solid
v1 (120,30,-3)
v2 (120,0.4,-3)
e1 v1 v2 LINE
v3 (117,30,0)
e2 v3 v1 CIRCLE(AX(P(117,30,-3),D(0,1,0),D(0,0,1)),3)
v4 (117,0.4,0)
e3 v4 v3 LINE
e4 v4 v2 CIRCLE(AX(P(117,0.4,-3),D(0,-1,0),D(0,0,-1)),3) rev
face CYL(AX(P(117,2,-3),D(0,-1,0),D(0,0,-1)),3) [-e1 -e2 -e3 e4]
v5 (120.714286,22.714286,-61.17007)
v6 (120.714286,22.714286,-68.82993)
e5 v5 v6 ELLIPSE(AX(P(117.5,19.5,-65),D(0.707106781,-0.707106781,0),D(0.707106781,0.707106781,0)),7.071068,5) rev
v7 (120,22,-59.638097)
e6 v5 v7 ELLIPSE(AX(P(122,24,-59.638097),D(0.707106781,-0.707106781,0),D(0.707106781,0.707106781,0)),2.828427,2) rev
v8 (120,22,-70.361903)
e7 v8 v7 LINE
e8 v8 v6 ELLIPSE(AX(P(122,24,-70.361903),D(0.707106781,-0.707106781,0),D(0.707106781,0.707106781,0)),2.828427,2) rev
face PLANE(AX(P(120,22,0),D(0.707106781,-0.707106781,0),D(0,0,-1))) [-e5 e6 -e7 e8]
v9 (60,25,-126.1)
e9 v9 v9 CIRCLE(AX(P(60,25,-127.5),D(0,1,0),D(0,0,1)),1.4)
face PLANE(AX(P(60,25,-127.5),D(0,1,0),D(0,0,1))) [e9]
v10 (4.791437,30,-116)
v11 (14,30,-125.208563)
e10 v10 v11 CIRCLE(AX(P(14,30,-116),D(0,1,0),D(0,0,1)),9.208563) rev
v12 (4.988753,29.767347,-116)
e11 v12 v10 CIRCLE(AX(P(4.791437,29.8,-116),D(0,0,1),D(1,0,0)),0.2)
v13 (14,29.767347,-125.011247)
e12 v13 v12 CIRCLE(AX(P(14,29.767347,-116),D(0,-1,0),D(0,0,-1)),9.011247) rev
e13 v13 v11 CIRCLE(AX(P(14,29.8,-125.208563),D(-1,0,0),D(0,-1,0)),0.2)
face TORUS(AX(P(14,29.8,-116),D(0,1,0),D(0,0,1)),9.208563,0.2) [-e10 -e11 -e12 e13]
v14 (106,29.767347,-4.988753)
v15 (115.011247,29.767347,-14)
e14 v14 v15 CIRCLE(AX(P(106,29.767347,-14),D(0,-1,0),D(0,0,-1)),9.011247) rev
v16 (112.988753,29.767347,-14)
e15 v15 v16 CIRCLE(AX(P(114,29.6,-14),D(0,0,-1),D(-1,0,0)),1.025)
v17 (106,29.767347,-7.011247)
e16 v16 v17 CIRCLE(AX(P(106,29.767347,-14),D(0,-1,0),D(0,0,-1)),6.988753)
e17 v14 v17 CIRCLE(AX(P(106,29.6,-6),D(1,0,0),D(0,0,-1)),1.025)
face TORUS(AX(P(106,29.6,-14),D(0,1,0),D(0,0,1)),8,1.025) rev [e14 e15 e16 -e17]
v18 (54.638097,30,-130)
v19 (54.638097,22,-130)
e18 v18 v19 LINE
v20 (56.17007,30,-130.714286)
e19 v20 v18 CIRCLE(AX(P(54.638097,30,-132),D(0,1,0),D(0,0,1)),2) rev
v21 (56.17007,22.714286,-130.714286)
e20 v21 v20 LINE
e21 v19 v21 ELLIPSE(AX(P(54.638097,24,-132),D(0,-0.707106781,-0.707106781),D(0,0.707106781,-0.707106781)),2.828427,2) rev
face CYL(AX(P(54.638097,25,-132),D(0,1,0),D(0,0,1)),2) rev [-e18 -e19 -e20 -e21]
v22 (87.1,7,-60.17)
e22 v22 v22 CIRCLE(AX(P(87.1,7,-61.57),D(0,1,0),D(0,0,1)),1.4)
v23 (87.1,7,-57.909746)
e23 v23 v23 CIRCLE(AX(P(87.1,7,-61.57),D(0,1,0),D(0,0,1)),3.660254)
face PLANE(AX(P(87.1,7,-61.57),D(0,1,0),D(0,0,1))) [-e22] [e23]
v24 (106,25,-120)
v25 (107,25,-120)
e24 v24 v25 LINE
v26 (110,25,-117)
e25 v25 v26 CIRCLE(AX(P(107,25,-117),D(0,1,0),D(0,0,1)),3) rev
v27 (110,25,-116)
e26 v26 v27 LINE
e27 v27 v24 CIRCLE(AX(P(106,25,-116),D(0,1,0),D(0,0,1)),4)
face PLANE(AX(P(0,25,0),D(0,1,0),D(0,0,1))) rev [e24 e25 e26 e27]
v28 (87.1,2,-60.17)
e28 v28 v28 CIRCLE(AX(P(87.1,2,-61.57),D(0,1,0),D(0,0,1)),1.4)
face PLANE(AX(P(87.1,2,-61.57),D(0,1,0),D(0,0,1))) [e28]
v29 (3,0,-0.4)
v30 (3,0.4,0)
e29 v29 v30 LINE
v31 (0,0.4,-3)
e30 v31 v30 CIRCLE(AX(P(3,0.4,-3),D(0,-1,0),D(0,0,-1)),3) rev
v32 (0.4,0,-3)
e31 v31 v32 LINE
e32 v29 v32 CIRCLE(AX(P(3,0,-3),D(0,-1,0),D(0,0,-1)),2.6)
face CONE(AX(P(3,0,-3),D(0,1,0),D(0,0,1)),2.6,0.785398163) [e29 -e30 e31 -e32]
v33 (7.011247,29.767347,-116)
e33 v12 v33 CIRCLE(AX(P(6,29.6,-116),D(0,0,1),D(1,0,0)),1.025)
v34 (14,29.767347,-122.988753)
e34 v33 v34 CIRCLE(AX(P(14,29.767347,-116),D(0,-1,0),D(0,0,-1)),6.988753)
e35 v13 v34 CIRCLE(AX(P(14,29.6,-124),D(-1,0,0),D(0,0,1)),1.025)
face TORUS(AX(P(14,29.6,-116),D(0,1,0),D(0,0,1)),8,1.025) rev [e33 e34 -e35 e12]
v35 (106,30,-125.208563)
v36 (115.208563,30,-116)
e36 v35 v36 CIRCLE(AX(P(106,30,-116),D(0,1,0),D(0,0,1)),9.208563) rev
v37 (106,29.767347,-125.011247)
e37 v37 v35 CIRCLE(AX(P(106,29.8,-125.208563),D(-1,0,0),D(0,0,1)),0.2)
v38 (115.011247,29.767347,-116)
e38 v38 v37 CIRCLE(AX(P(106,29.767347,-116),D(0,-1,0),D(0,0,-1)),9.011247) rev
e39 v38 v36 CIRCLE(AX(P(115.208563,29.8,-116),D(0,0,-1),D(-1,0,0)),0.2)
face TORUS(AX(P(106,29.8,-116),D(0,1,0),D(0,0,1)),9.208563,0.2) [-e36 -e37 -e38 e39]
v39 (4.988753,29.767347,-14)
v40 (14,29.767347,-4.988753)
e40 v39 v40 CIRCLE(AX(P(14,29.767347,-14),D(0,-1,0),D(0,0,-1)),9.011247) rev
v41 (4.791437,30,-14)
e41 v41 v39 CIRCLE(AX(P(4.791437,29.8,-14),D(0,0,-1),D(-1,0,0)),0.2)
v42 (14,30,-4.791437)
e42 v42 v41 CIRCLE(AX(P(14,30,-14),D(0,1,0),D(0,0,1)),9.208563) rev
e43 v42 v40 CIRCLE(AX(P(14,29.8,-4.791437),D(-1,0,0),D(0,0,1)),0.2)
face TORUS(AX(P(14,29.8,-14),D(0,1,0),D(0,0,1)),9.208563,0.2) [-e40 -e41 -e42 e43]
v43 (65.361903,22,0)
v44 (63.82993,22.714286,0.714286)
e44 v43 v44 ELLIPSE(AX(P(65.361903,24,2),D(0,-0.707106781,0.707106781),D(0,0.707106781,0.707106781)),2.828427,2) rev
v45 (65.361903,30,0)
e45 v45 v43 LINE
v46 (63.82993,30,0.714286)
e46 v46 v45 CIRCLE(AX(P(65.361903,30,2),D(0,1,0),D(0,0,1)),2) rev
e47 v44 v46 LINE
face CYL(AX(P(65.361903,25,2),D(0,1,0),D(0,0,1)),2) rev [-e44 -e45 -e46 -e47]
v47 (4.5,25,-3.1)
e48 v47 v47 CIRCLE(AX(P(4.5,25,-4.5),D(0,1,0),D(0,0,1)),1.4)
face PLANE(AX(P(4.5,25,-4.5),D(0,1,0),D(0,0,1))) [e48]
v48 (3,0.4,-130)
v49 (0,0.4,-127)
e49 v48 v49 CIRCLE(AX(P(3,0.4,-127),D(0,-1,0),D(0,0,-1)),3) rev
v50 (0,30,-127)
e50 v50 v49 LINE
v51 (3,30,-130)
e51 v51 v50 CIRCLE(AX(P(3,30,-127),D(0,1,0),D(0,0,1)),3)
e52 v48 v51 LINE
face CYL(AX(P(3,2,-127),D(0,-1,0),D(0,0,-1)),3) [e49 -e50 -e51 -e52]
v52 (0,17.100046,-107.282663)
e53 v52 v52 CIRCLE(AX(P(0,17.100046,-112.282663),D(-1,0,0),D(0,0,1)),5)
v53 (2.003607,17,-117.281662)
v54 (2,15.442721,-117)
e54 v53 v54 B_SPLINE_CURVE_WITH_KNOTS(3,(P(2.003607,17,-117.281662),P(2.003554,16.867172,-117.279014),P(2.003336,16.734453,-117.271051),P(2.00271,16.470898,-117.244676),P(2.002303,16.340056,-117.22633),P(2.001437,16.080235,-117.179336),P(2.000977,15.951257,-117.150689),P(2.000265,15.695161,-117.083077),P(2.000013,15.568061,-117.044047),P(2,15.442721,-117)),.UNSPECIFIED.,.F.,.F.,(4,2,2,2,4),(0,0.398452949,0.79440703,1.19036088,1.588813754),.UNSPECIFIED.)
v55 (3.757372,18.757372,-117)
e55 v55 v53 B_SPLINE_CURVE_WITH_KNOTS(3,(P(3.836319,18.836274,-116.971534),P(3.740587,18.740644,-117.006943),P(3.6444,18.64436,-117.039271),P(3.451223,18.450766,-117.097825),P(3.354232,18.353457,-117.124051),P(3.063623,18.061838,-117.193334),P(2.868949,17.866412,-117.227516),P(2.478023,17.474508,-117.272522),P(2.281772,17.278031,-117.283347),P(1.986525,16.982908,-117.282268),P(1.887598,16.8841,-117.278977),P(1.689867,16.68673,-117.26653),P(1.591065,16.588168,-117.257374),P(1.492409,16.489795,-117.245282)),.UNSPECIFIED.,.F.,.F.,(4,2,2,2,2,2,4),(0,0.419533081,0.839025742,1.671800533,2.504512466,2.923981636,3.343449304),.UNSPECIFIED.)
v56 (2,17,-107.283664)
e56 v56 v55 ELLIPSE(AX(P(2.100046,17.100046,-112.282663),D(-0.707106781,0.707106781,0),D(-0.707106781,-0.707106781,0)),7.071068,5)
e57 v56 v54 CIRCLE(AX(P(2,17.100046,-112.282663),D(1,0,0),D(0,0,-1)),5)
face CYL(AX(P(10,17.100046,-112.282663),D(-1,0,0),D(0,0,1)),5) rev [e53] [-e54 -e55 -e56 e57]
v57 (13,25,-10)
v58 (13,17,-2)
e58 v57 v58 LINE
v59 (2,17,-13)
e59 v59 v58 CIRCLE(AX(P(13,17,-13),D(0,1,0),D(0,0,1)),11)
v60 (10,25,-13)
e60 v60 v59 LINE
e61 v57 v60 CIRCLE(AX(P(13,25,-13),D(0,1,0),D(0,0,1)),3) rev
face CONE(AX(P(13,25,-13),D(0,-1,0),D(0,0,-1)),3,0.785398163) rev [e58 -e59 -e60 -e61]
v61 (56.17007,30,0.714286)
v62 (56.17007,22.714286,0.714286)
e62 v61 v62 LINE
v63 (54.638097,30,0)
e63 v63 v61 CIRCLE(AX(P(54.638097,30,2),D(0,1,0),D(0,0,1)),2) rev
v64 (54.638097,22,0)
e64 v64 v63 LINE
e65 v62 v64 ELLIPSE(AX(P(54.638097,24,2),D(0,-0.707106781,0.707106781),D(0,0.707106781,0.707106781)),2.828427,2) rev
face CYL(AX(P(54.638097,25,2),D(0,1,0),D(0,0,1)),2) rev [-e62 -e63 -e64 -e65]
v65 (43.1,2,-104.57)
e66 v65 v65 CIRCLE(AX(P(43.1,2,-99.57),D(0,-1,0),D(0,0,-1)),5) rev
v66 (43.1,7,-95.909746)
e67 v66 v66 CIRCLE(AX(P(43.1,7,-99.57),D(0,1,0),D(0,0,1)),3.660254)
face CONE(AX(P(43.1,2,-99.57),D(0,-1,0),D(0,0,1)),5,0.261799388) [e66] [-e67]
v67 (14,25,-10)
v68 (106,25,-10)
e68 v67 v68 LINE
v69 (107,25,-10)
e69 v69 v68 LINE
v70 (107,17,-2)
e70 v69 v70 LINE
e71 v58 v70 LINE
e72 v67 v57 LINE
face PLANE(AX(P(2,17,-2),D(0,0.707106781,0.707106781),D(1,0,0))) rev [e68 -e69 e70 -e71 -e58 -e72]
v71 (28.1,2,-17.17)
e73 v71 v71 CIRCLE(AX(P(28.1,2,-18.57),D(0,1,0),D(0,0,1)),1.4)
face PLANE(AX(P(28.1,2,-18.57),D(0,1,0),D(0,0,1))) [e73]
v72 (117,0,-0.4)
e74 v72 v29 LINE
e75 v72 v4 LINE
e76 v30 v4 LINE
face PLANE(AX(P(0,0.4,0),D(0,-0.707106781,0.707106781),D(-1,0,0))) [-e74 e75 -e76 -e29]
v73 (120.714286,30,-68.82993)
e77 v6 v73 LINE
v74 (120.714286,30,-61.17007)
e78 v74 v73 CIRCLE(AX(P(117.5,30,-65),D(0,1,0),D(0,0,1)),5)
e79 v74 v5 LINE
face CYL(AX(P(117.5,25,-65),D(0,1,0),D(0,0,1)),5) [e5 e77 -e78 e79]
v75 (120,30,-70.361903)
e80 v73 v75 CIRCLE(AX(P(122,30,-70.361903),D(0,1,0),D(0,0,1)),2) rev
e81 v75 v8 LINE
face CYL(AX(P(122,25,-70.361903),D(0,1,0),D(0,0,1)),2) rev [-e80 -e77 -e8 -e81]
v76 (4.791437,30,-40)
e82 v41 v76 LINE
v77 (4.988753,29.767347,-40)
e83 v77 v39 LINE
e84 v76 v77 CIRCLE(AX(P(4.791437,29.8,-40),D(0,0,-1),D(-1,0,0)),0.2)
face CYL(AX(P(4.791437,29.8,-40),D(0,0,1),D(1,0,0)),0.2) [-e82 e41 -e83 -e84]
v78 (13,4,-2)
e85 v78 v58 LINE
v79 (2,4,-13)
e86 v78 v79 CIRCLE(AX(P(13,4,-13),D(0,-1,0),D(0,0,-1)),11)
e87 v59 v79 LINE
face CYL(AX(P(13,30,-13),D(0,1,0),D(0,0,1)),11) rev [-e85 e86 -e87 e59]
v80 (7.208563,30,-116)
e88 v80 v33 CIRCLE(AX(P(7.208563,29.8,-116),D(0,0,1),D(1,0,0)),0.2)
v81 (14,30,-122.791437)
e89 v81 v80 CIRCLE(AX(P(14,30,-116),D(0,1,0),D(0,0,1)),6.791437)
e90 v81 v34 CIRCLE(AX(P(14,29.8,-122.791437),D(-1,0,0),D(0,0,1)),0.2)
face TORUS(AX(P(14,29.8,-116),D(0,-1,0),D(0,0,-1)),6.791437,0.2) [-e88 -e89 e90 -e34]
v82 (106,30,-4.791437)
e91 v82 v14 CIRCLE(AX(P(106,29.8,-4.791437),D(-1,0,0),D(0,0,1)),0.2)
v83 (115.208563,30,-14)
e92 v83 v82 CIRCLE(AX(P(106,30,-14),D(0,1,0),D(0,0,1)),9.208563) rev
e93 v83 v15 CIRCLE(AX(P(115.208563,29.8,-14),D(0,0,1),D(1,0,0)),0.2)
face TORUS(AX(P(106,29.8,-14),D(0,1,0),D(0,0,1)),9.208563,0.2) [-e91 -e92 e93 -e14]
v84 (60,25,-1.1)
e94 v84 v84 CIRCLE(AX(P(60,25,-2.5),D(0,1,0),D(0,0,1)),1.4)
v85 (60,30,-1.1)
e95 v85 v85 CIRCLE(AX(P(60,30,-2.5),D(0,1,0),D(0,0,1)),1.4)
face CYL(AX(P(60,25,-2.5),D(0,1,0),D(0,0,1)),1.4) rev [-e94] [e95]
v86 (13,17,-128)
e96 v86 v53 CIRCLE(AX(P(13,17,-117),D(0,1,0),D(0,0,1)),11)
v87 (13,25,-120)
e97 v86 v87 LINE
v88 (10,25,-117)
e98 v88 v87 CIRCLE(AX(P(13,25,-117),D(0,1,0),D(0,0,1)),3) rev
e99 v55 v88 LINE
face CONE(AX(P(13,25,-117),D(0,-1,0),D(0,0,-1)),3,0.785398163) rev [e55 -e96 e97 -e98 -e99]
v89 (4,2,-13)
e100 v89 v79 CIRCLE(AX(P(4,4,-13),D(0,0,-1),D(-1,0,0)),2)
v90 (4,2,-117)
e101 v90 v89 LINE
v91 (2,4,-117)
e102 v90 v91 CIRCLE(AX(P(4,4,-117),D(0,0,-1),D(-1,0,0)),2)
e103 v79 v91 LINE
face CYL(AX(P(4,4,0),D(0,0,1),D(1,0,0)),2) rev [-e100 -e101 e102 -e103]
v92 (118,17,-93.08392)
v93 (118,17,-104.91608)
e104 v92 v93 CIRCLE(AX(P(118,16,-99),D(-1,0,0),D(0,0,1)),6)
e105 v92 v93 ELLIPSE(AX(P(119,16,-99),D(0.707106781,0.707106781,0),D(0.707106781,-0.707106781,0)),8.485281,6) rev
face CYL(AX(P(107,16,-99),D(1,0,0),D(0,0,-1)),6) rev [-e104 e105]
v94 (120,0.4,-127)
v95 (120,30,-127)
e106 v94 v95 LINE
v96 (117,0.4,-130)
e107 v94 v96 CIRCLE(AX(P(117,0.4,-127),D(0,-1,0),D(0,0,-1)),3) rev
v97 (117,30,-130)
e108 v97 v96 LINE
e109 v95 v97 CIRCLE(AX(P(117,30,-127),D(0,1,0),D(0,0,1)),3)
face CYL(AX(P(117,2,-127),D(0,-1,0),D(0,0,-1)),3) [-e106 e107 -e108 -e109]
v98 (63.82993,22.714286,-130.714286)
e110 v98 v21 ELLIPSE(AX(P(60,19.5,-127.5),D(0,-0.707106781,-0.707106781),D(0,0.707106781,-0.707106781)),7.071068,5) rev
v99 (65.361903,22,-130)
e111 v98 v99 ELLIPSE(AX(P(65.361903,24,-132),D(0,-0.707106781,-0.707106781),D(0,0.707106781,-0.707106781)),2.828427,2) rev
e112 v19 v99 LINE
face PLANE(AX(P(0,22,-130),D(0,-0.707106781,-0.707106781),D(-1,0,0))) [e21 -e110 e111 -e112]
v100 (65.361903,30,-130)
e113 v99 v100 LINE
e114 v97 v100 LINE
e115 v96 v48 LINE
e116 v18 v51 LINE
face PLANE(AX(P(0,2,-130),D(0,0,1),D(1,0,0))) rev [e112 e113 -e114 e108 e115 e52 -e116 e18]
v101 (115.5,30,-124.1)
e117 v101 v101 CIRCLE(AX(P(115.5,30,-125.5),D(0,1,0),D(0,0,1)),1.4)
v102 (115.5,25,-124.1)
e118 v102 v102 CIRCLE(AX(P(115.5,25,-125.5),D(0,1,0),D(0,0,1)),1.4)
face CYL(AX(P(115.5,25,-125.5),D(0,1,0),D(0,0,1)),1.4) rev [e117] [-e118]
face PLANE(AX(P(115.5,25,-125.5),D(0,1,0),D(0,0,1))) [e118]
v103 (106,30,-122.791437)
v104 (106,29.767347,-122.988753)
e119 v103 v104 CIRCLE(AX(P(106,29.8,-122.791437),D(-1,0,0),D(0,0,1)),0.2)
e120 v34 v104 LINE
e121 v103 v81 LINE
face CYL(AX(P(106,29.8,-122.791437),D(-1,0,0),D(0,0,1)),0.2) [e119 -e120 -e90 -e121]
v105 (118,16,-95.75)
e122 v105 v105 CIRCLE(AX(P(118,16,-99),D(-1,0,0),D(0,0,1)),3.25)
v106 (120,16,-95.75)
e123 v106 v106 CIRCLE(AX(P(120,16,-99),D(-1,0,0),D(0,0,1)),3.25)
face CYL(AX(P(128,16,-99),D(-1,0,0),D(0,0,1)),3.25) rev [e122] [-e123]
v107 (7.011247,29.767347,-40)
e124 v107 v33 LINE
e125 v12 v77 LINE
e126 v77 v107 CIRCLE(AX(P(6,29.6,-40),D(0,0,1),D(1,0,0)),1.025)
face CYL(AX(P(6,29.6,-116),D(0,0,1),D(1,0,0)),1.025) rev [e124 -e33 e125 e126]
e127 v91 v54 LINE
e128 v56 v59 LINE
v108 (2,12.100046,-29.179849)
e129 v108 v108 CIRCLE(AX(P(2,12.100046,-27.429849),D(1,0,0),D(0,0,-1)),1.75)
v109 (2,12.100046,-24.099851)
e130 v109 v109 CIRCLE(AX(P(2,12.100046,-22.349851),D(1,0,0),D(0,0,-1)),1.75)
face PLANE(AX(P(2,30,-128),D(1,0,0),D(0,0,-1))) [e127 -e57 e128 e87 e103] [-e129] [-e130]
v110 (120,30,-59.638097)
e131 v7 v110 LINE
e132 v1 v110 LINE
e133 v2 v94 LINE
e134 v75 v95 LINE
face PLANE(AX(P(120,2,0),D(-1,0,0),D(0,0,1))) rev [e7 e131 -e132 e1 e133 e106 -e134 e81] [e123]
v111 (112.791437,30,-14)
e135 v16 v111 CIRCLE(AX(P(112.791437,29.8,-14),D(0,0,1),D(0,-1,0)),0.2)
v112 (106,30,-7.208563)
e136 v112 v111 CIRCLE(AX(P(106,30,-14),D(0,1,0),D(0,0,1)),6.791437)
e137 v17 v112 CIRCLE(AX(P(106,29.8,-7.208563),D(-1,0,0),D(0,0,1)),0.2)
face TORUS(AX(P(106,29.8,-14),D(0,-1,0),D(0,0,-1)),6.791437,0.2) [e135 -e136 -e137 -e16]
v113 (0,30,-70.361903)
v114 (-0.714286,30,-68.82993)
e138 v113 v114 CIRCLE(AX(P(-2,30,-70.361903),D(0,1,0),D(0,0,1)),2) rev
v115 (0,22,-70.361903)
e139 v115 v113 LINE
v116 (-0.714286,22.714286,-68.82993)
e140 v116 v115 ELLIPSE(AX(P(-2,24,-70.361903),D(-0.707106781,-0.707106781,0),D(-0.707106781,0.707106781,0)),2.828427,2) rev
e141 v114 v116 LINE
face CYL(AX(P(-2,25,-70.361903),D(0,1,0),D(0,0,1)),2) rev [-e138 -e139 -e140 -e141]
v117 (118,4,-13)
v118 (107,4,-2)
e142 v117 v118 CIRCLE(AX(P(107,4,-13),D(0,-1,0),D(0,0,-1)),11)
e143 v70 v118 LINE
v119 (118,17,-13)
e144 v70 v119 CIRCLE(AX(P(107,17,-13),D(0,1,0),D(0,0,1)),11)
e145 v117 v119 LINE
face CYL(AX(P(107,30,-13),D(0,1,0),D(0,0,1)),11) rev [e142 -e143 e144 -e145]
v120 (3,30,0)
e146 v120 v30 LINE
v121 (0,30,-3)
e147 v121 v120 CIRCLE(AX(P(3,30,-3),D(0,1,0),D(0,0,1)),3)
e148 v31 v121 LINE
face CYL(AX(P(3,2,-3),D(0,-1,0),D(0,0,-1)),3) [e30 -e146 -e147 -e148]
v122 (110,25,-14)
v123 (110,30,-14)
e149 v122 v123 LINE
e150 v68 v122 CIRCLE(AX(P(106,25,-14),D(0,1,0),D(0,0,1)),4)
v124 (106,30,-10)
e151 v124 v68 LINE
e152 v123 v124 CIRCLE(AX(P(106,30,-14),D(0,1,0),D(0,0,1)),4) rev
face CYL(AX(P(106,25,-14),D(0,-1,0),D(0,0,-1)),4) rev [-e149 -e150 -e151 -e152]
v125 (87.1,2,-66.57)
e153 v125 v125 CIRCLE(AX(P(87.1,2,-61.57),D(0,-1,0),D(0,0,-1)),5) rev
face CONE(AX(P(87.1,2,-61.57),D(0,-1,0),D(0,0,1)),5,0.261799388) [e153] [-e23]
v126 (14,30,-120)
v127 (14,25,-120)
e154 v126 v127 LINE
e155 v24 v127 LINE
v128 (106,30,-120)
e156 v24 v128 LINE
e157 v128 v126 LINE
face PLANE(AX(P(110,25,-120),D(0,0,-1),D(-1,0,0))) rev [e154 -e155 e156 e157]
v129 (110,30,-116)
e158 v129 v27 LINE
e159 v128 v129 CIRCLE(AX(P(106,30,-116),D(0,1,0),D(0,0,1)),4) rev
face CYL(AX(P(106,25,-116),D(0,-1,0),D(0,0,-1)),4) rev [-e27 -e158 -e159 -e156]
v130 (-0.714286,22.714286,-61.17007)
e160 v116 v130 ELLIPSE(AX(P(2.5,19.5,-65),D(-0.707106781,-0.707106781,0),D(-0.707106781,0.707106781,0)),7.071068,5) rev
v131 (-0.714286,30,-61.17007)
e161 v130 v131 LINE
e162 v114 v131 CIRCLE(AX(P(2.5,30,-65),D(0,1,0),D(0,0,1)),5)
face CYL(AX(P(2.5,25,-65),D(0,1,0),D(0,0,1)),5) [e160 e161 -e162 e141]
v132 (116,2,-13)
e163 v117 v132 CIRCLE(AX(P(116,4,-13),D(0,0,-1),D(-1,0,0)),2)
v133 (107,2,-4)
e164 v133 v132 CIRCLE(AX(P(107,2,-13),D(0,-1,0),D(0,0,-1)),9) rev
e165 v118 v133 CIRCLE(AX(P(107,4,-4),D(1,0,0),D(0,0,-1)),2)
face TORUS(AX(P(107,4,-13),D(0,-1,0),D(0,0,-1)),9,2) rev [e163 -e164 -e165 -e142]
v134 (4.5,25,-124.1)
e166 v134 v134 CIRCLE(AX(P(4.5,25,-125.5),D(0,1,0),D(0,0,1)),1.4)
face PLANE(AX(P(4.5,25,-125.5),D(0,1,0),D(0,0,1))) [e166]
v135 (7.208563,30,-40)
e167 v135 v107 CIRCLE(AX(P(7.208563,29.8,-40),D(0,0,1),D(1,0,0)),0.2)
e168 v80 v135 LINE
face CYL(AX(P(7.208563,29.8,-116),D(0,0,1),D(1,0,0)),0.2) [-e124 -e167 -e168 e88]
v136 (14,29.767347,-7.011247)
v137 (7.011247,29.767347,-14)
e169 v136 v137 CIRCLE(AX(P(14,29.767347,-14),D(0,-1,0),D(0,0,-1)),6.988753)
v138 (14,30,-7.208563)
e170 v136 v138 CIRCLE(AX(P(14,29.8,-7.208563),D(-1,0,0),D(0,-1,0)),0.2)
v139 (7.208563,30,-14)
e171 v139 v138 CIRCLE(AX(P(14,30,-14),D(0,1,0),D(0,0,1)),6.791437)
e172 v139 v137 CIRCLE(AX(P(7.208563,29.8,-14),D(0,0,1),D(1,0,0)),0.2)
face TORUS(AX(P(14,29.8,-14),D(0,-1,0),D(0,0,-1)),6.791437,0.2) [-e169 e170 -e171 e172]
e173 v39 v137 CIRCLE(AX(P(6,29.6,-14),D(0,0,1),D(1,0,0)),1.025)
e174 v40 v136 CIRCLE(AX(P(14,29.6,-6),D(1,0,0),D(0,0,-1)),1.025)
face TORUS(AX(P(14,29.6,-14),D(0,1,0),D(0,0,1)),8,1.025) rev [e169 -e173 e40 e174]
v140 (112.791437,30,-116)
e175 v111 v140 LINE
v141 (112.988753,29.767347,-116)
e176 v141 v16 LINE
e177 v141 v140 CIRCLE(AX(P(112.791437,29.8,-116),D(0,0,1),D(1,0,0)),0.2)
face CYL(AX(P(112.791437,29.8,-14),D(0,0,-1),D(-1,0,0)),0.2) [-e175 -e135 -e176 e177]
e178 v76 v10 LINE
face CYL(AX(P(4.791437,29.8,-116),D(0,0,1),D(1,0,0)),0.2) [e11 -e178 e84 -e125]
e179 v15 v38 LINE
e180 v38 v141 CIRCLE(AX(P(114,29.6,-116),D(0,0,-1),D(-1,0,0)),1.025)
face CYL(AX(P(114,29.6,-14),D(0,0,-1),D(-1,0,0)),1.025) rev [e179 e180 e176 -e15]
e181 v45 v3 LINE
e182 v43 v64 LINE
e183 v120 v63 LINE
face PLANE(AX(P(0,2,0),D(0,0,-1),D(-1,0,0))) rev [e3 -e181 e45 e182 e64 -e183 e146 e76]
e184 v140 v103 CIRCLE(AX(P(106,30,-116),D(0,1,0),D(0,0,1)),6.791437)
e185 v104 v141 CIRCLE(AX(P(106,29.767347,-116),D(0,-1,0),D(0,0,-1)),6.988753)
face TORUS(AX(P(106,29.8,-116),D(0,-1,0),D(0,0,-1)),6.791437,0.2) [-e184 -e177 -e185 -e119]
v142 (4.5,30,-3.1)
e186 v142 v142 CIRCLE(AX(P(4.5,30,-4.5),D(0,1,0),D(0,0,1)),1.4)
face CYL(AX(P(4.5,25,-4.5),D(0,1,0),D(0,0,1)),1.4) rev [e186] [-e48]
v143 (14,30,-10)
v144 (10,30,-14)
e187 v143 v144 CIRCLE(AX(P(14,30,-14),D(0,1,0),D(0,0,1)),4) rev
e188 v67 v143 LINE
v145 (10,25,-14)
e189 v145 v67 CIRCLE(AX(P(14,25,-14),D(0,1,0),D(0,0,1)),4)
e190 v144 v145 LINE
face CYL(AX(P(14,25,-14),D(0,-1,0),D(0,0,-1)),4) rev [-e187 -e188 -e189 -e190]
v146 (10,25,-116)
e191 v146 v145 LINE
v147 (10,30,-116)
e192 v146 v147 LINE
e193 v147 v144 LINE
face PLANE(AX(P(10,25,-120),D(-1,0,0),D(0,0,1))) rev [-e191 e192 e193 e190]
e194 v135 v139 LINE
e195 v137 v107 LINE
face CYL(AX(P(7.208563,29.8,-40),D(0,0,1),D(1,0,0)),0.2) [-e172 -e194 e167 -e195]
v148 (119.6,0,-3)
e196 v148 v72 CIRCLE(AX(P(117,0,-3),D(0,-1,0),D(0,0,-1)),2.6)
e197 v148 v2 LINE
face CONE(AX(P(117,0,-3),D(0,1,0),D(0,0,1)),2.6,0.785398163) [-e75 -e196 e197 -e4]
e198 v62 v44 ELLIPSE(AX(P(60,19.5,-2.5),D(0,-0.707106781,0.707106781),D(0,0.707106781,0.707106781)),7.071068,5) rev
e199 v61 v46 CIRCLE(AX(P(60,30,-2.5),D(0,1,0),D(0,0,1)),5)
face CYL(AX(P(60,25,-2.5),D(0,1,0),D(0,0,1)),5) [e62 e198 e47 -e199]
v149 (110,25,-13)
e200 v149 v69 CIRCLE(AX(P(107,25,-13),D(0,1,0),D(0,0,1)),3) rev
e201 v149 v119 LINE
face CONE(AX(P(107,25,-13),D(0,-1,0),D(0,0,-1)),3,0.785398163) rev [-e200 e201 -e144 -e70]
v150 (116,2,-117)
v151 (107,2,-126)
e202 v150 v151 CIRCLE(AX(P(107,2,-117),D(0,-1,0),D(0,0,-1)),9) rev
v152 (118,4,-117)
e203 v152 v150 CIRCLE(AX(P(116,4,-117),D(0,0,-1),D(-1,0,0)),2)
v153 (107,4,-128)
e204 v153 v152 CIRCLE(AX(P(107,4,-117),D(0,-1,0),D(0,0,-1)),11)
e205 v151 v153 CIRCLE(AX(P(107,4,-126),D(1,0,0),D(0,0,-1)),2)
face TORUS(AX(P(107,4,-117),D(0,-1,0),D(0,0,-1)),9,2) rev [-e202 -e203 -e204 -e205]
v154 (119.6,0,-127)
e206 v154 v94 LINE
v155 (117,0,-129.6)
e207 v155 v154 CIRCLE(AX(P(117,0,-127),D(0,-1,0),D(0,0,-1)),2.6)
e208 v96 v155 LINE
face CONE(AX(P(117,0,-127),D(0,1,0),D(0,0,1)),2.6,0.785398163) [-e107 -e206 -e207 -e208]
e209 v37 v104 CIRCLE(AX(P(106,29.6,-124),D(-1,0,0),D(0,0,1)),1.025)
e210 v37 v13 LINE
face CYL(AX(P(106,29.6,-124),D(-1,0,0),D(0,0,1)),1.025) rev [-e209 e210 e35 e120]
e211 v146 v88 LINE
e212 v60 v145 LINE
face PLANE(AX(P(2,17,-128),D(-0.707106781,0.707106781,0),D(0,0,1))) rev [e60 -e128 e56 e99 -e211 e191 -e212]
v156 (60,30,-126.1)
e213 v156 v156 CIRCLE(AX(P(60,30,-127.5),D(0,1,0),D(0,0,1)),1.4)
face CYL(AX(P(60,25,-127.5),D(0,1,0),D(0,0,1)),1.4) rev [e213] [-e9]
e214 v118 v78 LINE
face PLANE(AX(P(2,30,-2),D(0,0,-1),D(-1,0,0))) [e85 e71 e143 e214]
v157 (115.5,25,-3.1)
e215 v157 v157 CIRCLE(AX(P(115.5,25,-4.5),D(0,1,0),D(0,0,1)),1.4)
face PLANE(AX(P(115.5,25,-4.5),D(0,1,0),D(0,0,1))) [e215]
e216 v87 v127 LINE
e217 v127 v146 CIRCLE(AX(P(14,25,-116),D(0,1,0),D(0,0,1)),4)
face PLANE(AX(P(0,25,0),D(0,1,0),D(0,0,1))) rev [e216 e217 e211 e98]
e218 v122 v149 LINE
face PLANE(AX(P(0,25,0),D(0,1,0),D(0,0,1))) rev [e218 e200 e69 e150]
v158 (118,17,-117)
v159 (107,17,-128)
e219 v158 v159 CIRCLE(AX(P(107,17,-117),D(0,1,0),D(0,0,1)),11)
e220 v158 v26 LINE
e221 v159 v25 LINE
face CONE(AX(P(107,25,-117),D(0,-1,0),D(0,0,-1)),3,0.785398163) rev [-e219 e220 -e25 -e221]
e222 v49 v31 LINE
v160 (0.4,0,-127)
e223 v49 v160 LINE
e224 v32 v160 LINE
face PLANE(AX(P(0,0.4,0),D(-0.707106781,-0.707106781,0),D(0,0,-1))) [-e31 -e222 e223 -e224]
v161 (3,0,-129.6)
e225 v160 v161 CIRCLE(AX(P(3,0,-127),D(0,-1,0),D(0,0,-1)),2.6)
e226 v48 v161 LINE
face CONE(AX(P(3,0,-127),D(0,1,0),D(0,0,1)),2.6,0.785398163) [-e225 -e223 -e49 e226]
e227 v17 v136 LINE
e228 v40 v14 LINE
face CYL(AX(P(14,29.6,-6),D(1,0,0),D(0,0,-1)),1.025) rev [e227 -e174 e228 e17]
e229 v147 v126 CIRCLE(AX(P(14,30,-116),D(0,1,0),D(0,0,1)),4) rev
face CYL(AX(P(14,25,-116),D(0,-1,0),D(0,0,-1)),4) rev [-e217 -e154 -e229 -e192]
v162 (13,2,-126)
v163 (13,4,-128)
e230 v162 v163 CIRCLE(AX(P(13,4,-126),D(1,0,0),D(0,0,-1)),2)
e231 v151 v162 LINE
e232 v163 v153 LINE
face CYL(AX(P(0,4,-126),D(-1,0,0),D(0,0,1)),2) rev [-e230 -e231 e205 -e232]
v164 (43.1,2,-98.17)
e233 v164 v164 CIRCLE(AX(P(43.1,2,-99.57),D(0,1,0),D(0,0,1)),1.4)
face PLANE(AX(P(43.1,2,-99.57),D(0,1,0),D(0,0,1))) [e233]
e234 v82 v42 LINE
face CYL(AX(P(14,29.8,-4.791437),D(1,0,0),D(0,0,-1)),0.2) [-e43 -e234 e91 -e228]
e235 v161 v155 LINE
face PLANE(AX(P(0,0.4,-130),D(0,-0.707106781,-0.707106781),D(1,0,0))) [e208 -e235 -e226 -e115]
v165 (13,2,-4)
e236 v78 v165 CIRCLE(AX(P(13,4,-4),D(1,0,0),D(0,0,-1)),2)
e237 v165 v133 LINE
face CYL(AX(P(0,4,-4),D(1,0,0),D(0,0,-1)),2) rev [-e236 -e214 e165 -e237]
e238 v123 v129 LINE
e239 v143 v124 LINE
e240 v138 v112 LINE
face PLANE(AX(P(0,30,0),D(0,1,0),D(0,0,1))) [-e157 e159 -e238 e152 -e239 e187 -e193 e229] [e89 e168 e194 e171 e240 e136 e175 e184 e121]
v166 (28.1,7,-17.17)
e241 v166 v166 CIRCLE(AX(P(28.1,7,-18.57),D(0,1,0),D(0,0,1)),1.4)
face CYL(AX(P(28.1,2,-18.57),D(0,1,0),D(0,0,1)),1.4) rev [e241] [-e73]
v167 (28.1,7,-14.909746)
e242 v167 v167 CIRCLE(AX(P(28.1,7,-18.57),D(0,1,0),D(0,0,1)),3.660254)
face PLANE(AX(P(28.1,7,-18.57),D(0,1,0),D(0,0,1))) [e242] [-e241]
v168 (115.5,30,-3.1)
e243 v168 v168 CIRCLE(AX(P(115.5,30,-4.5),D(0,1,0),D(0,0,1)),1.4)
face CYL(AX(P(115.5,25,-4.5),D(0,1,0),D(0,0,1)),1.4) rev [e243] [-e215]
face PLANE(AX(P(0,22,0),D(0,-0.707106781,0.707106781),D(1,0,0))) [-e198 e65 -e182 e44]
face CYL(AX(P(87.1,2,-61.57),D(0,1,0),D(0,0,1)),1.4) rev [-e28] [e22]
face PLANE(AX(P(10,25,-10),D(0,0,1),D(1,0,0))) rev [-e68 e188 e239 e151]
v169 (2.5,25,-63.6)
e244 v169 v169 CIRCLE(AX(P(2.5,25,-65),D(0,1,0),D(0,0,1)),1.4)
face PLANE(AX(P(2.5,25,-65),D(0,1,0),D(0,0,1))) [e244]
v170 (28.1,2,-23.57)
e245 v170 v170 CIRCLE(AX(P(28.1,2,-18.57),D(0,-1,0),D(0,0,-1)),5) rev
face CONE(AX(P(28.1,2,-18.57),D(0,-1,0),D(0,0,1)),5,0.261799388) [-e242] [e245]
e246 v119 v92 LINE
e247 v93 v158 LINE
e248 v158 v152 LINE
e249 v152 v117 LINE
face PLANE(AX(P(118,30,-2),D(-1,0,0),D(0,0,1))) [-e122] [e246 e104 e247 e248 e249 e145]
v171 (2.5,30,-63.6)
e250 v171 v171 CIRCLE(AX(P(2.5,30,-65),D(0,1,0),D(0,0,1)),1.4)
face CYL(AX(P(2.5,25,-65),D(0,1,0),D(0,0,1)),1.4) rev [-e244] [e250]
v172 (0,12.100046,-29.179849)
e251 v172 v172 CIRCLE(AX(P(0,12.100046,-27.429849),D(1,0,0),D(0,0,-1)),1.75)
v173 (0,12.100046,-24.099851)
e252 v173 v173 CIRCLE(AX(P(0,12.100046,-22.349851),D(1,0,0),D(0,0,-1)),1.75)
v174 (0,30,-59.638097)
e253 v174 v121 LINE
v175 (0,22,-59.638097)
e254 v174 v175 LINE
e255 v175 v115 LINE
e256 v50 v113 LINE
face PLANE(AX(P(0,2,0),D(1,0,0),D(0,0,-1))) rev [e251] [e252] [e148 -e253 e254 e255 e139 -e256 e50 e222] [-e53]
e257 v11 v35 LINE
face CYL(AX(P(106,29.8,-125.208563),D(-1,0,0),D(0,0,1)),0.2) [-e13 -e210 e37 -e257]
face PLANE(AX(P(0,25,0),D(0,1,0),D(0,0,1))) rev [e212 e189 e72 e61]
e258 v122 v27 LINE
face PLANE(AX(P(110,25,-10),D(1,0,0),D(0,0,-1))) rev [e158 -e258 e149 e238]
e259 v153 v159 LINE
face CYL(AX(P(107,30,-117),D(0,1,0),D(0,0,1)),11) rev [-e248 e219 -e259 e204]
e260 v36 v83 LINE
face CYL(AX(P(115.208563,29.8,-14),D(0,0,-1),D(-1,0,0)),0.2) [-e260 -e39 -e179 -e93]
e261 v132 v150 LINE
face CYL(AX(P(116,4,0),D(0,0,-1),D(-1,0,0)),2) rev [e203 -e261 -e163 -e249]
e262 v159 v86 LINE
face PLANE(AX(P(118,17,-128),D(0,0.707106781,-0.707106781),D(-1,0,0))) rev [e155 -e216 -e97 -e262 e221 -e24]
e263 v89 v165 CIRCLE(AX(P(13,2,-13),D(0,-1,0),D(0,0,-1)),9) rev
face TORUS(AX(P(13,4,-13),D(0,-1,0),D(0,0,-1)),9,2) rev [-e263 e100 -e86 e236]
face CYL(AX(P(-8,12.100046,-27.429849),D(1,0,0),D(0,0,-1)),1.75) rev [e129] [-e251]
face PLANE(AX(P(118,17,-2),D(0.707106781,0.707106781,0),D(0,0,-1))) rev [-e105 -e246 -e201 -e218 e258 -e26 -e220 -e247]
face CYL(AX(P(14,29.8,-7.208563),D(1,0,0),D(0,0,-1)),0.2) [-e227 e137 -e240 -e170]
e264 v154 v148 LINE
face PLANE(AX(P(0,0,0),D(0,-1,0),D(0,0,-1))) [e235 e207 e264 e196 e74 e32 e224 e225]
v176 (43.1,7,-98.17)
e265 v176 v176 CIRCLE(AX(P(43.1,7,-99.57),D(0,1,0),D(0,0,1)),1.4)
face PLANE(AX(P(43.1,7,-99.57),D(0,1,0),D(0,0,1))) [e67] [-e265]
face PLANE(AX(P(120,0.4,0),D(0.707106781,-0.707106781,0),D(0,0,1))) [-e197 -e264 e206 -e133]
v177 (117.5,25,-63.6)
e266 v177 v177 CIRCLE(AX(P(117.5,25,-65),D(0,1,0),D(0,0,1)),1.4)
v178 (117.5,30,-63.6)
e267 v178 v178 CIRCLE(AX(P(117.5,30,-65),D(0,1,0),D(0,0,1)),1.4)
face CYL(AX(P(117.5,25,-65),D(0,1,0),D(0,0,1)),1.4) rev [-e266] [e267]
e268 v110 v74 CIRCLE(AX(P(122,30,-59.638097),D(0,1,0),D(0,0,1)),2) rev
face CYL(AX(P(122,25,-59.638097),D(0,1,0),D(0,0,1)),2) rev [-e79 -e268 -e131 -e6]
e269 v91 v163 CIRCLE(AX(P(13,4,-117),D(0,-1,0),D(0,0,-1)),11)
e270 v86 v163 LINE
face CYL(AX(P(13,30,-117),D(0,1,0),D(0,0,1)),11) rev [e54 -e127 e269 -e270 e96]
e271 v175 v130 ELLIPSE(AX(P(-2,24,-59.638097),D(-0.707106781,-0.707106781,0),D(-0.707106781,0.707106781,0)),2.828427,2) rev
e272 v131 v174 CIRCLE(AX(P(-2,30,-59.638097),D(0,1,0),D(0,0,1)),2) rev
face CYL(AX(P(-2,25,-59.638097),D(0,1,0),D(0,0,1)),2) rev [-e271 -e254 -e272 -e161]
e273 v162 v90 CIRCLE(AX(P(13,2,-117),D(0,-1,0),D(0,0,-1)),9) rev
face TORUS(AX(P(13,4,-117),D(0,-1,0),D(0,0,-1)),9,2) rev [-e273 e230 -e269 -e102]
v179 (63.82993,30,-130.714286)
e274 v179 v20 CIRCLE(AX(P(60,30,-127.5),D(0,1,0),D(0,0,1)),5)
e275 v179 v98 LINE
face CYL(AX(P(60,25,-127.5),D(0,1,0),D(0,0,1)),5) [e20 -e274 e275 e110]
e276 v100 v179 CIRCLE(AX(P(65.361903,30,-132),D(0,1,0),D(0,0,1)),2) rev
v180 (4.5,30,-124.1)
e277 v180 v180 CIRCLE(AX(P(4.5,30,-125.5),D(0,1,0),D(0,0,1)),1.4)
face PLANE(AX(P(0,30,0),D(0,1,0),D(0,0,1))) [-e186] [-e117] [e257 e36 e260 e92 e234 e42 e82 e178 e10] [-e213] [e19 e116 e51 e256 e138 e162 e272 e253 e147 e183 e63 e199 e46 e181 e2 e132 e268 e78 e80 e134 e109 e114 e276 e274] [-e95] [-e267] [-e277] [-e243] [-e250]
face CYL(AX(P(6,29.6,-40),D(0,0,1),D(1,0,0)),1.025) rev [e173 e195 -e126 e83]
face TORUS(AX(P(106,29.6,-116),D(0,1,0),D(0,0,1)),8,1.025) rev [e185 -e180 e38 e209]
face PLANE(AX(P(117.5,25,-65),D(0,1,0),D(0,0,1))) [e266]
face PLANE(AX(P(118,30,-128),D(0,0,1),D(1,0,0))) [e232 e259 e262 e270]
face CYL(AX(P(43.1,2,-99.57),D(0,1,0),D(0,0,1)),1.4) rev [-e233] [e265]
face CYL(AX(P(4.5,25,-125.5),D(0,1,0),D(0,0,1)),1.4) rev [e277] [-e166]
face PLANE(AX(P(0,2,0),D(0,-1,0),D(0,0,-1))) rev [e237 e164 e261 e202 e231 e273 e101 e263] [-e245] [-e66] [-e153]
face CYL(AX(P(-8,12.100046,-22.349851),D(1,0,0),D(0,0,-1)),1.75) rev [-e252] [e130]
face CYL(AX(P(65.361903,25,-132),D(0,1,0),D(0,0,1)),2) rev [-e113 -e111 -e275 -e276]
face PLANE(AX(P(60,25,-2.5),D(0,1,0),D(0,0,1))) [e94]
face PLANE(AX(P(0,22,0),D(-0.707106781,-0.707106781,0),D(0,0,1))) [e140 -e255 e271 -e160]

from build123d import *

# Parameters (mm, degrees)
SKETCH_1_W                = 120
SKETCH_1_H                = 130
EXTRUDE_1_DEPTH           = 2
SKETCH_2_R                = 5
EXTRUDE_2_DEPTH           = 5
EXTRUDE_2_DRAFT           = 15
EXTRUDE_2_PROFILE_2_DEPTH = 5
EXTRUDE_2_PROFILE_2_DRAFT = 15
EXTRUDE_2_PROFILE_3_DEPTH = 5
EXTRUDE_2_PROFILE_3_DRAFT = 15
SKETCH_3_R                = 1.4
CUT_EXTRUDE_1_DEPTH       = 5
SKETCH_4_W                = 120
SKETCH_4_H                = 130
SKETCH_4_W_2              = 116
SKETCH_4_H_2              = 126
EXTRUDE_3_DEPTH           = 28
SKETCH_5_W                = 116
SKETCH_5_H                = 126
SKETCH_5_W_2              = 100
SKETCH_5_H_2              = 110
EXTRUDE_4_DEPTH           = 5
SKETCH_9_R                = 3.25
CUT_EXTRUDE_4_DEPTH       = 10
SKETCH_10_R               = 1.75
CUT_EXTRUDE_5_DEPTH       = 10
FILLET_1_R                = 4
FILLET_2_R                = 11
CHAMFER_5_SIZE            = 8
SKETCH_15_R               = 1.025
FILLET_4_R                = 3
FILLET_5_R                = 2
CHAMFER_6_SIZE            = 0.4
SKETCH_16_R               = 6
CUT_EXTRUDE_7_DEPTH       = 11
SKETCH_17_R               = 1.4
CUT_EXTRUDE_8_DEPTH       = 5
EXTRUDE_5_DEPTH           = 5
CHAMFER_7_SIZE            = 3
FILLET_6_R                = 2
FILLET_7_R                = 0.2
SKETCH_19_R               = 5
CUT_EXTRUDE_9_DEPTH       = 10


with BuildPart() as part:
    # 草图1 → 凸台-拉伸1 (new body)
    with BuildSketch(Plane(origin=(0, 0, 0), x_dir=(1, 0, 0), z_dir=(0, 1, 0))):
        with Locations((60, 65)):
            Rectangle(SKETCH_1_W, SKETCH_1_H)
    extrude(amount=EXTRUDE_1_DEPTH)


with BuildPart() as extrude_2_tool:
    # 草图2 → 凸台-拉伸2 (with draft: the straight prism first)
    with BuildSketch(Plane(origin=(0, 2, 0), x_dir=(1, 0, 0), z_dir=(0, 1, 0))):
        with Locations((87.1, 61.57)):
            Circle(SKETCH_2_R)
    extrude(amount=EXTRUDE_2_DEPTH)
    # 凸台-拉伸2: the draft: its side faces are tilted about the plane it starts from
    extrude_2_sides = [extrude_2_tool.faces().sort_by_distance(p)[0] for p in [
        (82.1, 4.5, -61.57),
    ]]
    draft(extrude_2_sides, Plane(origin=(0, 2, 0), x_dir=(1, 0, 0), z_dir=(0, 1, 0)), EXTRUDE_2_DRAFT)


with BuildPart() as part_1:
    add(part.part)

    # 凸台-拉伸2: add extrude_2_tool
    add(extrude_2_tool.part)


with BuildPart() as extrude_2_profile_2_tool:
    # 草图2 → 凸台-拉伸2 profile 2 (with draft: the straight prism first)
    with BuildSketch(Plane(origin=(0, 2, 0), x_dir=(1, 0, 0), z_dir=(0, 1, 0))):
        with Locations((43.1, 99.57)):
            Circle(SKETCH_2_R)
    extrude(amount=EXTRUDE_2_PROFILE_2_DEPTH)
    # 凸台-拉伸2 profile 2: the draft: its side faces are tilted about the plane it starts from
    extrude_2_profile_2_sides = [extrude_2_profile_2_tool.faces().sort_by_distance(p)[0] for p in [
        (38.1, 4.5, -99.57),
    ]]
    draft(extrude_2_profile_2_sides, Plane(origin=(0, 2, 0), x_dir=(1, 0, 0), z_dir=(0, 1, 0)), EXTRUDE_2_PROFILE_2_DRAFT)


with BuildPart() as part_2:
    add(part_1.part)

    # 凸台-拉伸2 profile 2: add extrude_2_profile_2_tool
    add(extrude_2_profile_2_tool.part)


with BuildPart() as extrude_2_profile_3_tool:
    # 草图2 → 凸台-拉伸2 profile 3 (with draft: the straight prism first)
    with BuildSketch(Plane(origin=(0, 2, 0), x_dir=(1, 0, 0), z_dir=(0, 1, 0))):
        with Locations((28.1, 18.57)):
            Circle(SKETCH_2_R)
    extrude(amount=EXTRUDE_2_PROFILE_3_DEPTH)
    # 凸台-拉伸2 profile 3: the draft: its side faces are tilted about the plane it starts from
    extrude_2_profile_3_sides = [extrude_2_profile_3_tool.faces().sort_by_distance(p)[0] for p in [
        (23.1, 4.5, -18.57),
    ]]
    draft(extrude_2_profile_3_sides, Plane(origin=(0, 2, 0), x_dir=(1, 0, 0), z_dir=(0, 1, 0)), EXTRUDE_2_PROFILE_3_DRAFT)


with BuildPart() as part_3:
    add(part_2.part)

    # 凸台-拉伸2 profile 3: add extrude_2_profile_3_tool
    add(extrude_2_profile_3_tool.part)

    # 草图3 → 切除-拉伸1 (cut)
    with BuildSketch(Plane(origin=(0, 7, 0), x_dir=(1, 0, 0), z_dir=(0, 1, 0))):
        with Locations(Location((87.1, 61.57, 0), (0, 0, 270))):
            Circle(SKETCH_3_R)
        with Locations(Location((43.1, 99.57, 0), (0, 0, 270))):
            Circle(SKETCH_3_R)
        with Locations(Location((28.1, 18.57, 0), (0, 0, 270))):
            Circle(SKETCH_3_R)
    extrude(amount=-CUT_EXTRUDE_1_DEPTH, mode=Mode.SUBTRACT)

    # 草图4 → 凸台-拉伸3 (add)
    with BuildSketch(Plane(origin=(0, 2, 0), x_dir=(1, 0, 0), z_dir=(0, 1, 0))):
        with Locations((60, 65)):
            Rectangle(SKETCH_4_W, SKETCH_4_H)
        with Locations((60, 65)):
            Rectangle(SKETCH_4_W_2, SKETCH_4_H_2, mode=Mode.SUBTRACT)
    extrude(amount=EXTRUDE_3_DEPTH)

    # 草图5 → 凸台-拉伸4 (add)
    with BuildSketch(Plane(origin=(0, 30, 0), x_dir=(1, 0, 0), z_dir=(0, 1, 0))):
        with Locations((60, 65)):
            Rectangle(SKETCH_5_W, SKETCH_5_H)
        with Locations((60, 65)):
            Rectangle(SKETCH_5_W_2, SKETCH_5_H_2, mode=Mode.SUBTRACT)
    extrude(amount=-EXTRUDE_4_DEPTH)

    # 草图9 → 切除-拉伸4 (cut)
    with BuildSketch(Plane.ZY.offset(-118)):
        with Locations((-99, 16)):
            Circle(SKETCH_9_R)
    extrude(amount=-CUT_EXTRUDE_4_DEPTH, mode=Mode.SUBTRACT)

    # 草图10 → 切除-拉伸5 (cut)
    with BuildSketch(Plane(origin=(2, 0, 0), x_dir=(0, 0, -1), z_dir=(1, 0, 0))):
        with Locations((27.429848891, 12.10004636)):
            Circle(SKETCH_10_R)
        with Locations((22.349851397, 12.10004636)):
            Circle(SKETCH_10_R)
    extrude(amount=-CUT_EXTRUDE_5_DEPTH, mode=Mode.SUBTRACT)

    # 圆角1
    fillet_1_edges = [part_3.edges().sort_by_distance(p)[0] for p in [
        (110, 27.5, -120),
        (110, 27.5, -10),
        (10, 27.5, -10),
        (10, 27.5, -120),
    ]]
    fillet(fillet_1_edges, radius=FILLET_1_R)

    # 圆角2
    fillet_2_edges = [part_3.edges().sort_by_distance(p)[0] for p in [
        (118, 13.5, -2),
        (118, 13.5, -128),
        (2, 13.5, -2),
        (2, 13.5, -128),
    ]]
    fillet(fillet_2_edges, radius=FILLET_2_R)

    # 倒角5
    # the kernel refuses this chamfer: 8 mm, written as the material it adds along each edge
    with BuildSketch(Plane(origin=(107, 25, -128), x_dir=(0, 0.02749587661058651, 0.9996219169112968), z_dir=(-1, 0, 0)), Plane(origin=(13, 25, -2), x_dir=(0, 0.027495876610586494, -0.9996219169112968), z_dir=(1, 0, 0))) as chamfer_5_piece_1:
        Polygon((CHAMFER_5_SIZE * 0.999621916911, -CHAMFER_5_SIZE * 0.0274958766106), (-CHAMFER_5_SIZE * 0.0274958766106, -CHAMFER_5_SIZE * 0.999621916911), (0, 0), align=None)
    extrude(amount=94)
    with BuildSketch(Plane(origin=(2, 25, -117), x_dir=(0.9996219169112968, 0.027495876610586494, 0), z_dir=(0, 0, 1))) as chamfer_5_piece_2:
        Polygon((CHAMFER_5_SIZE * 0.999621916911, -CHAMFER_5_SIZE * 0.0274958766106), (-CHAMFER_5_SIZE * 0.0274958766106, -CHAMFER_5_SIZE * 0.999621916911), (0, 0), align=None)
    extrude(amount=104)
    with BuildSketch(Plane(origin=(118, 25, -13), x_dir=(-0.9996219169112968, 0.02749587661058651, 0), z_dir=(0, 0, -1))) as chamfer_5_piece_3_section:
        Polygon((CHAMFER_5_SIZE * 0.999621916911, -CHAMFER_5_SIZE * 0.0274958766106), (-CHAMFER_5_SIZE * 0.0274958766106, -CHAMFER_5_SIZE * 0.999621916911), (0, 0), align=None)
    chamfer_5_piece_3 = extrude(amount=104, mode=Mode.PRIVATE)
    chamfer_5_piece_3 = chamfer_5_piece_3 - Plane(origin=(114.666113752, 16, -99), x_dir=(0, 0, 1), z_dir=(-1, 0, 0)) * Cylinder(3.25, 240, mode=Mode.PRIVATE)
    add(chamfer_5_piece_3)
    with BuildSketch(Plane(origin=(13, 25, -13), x_dir=(0, 0, 1), z_dir=(1, 0, 0))) as chamfer_5_piece_4:
        Polygon((11 - CHAMFER_5_SIZE, 0), (11, CHAMFER_5_SIZE), (11, 0), align=None)
    revolve(axis=Axis((13, 25, -13), (0, -1, 0)), revolution_arc=90)
    with BuildSketch(Plane(origin=(107, 25, -13), x_dir=(0, 0, 1), z_dir=(-1, 0, 0))) as chamfer_5_piece_5:
        Polygon((11 - CHAMFER_5_SIZE, 0), (11, -CHAMFER_5_SIZE), (11, 0), align=None)
    revolve(axis=Axis((107, 25, -13), (0, 1, 0)), revolution_arc=90)
    with BuildSketch(Plane(origin=(107, 25, -117), x_dir=(1, 0, 0), z_dir=(0, 0, 1))) as chamfer_5_piece_6:
        Polygon((11 - CHAMFER_5_SIZE, 0), (11, -CHAMFER_5_SIZE), (11, 0), align=None)
    revolve(axis=Axis((107, 25, -117), (0, 1, 0)), revolution_arc=90)
    with BuildSketch(Plane(origin=(13, 25, -117), x_dir=(0, 0, -1), z_dir=(1, 0, 0))) as chamfer_5_piece_7:
        Polygon((11 - CHAMFER_5_SIZE, 0), (11, -CHAMFER_5_SIZE), (11, 0), align=None)
    revolve(axis=Axis((13, 25, -117), (0, 1, 0)), revolution_arc=90)

    # 切除-扫描2: sweep along a path in 草图13
    with BuildLine(Plane(origin=(0, 30, 0), x_dir=(1, 0, 0), z_dir=(0, 1, 0))) as sweep_2_path:
        Line((14, 6), (106, 6))
        ThreePointArc((106, 6), (111.656854249, 8.343145751), (114, 14))
        Line((114, 14), (114, 116))
        ThreePointArc((114, 116), (111.656854249, 121.656854249), (106, 124))
        Line((106, 124), (14, 124))
        ThreePointArc((14, 124), (8.343145751, 121.656854249), (6, 116))
        Line((6, 116), (6, 14))
        ThreePointArc((6, 14), (8.343145751, 8.343145751), (14, 6))
    # 草图15 → 切除-扫描2 (sweep, cut)
    with BuildSketch(Plane.XY.offset(-40)):
        with Locations((6, 29.6)):
            Circle(SKETCH_15_R)
    sweep(path=sweep_2_path.line, mode=Mode.SUBTRACT)

    # 圆角4
    fillet_4_edges = [part_3.edges().sort_by_distance(p)[0] for p in [
        (0, 15, -130),
        (120, 15, -130),
        (120, 15, 0),
        (0, 15, 0),
    ]]
    fillet(fillet_4_edges, radius=FILLET_4_R)

    # 圆角5
    fillet_5_edges = [part_3.edges().sort_by_distance(p)[0] for p in [
        (60, 2, -128),
        (118, 2, -65),
        (2, 2, -65),
        (60, 2, -2),
        (5.221825407, 2, -5.221825407),
        (114.778174593, 2, -5.221825407),
        (114.778174593, 2, -124.778174593),
        (5.221825407, 2, -124.778174593),
    ]]
    fillet(fillet_5_edges, radius=FILLET_5_R)

    # 倒角6
    chamfer_6_edges = [part_3.edges().sort_by_distance(p)[0] for p in [
        (0, 0, -65),
        (60, 0, -130),
        (120, 0, -65),
        (60, 0, 0),
        (119.121320344, 0, -129.121320344),
        (119.121320344, 0, -0.878679656),
        (0.878679656, 0, -0.878679656),
        (0.878679656, 0, -129.121320344),
    ]]
    chamfer(chamfer_6_edges, length=CHAMFER_6_SIZE)

    # 草图16 → 切除-拉伸7 (cut)
    with BuildSketch(Plane.ZY.offset(-118)):
        with Locations((-99, 16)):
            Circle(SKETCH_16_R)
    extrude(amount=CUT_EXTRUDE_7_DEPTH, mode=Mode.SUBTRACT)

    # 草图17 → 切除-拉伸8 (cut)
    with BuildSketch(Plane(origin=(0, 30, 0), x_dir=(1, 0, 0), z_dir=(0, 1, 0))):
        with Locations(Location((4.5, 125.5, 0), (0, 0, 270))):
            Circle(SKETCH_17_R)
        with Locations(Location((115.5, 125.5, 0), (0, 0, 270))):
            Circle(SKETCH_17_R)
        with Locations(Location((115.5, 4.5, 0), (0, 0, 270))):
            Circle(SKETCH_17_R)
        with Locations(Location((4.5, 4.5, 0), (0, 0, 270))):
            Circle(SKETCH_17_R)
        with Locations(Location((2.5, 65, 0), (0, 0, 270))):
            Circle(SKETCH_17_R)
        with Locations(Location((117.5, 65, 0), (0, 0, 270))):
            Circle(SKETCH_17_R)
        with Locations(Location((60, 127.5, 0), (0, 0, 270))):
            Circle(SKETCH_17_R)
        with Locations(Location((60, 2.5, 0), (0, 0, 270))):
            Circle(SKETCH_17_R)
    extrude(amount=-CUT_EXTRUDE_8_DEPTH, mode=Mode.SUBTRACT)

    # 草图18 → 凸台-拉伸5 (add)
    with BuildSketch(Plane(origin=(0, 30, 0), x_dir=(1, 0, 0), z_dir=(0, 1, 0))):
        with BuildLine():
            Line((55.669872981, 130), (64.330127019, 130))
            ThreePointArc((64.330127019, 130), (60, 132.5), (55.669872981, 130))
        make_face()
        with BuildLine():
            Line((120, 69.330127019), (120, 60.669872981))
            ThreePointArc((120, 60.669872981), (122.5, 65), (120, 69.330127019))
        make_face()
        with BuildLine():
            Line((55.669872981, 0), (64.330127019, 0))
            ThreePointArc((64.330127019, 0), (60, -2.5), (55.669872981, 0))
        make_face()
        with BuildLine():
            Line((0, 69.330127019), (0, 60.669872981))
            ThreePointArc((0, 60.669872981), (-2.5, 65), (0, 69.330127019))
        make_face()
    extrude(amount=-EXTRUDE_5_DEPTH)

    # 倒角7
    # the kernel refuses this chamfer: 3 mm, written as the material it adds along each edge
    with BuildSketch(Plane(origin=(47.954824017, 25, 0), x_dir=(0, -0.9996219169112968, -0.02749587661058636), z_dir=(1, 0, 0))) as chamfer_7_piece_1_section:
        Polygon((CHAMFER_7_SIZE * 0.999621916911, -CHAMFER_7_SIZE * 0.0274958766106), (-CHAMFER_7_SIZE * 0.0274958766106, -CHAMFER_7_SIZE * 0.999621916911), (0, 0), align=None)
    chamfer_7_piece_1 = extrude(amount=24.090351966, mode=Mode.PRIVATE)
    chamfer_7_piece_1 = chamfer_7_piece_1 & Plane(origin=(60, 23.891170703, -2.5), x_dir=(0.866025403784438, 0, 0.5000000000000012), z_dir=(0, 1, 0)) * Cylinder(5, 61, mode=Mode.PRIVATE)
    add(chamfer_7_piece_1)
    with BuildSketch(Plane(origin=(120, 25, -77.045175983), x_dir=(-0.027495876610586768, -0.9996219169112968, 0), z_dir=(0, 0, 1))) as chamfer_7_piece_2_section:
        Polygon((CHAMFER_7_SIZE * 0.999621916911, CHAMFER_7_SIZE * 0.0274958766106), (-CHAMFER_7_SIZE * 0.0274958766106, CHAMFER_7_SIZE * 0.999621916911), (0, 0), align=None)
    chamfer_7_piece_2 = extrude(amount=24.090351966, mode=Mode.PRIVATE)
    chamfer_7_piece_2 = chamfer_7_piece_2 & Plane(origin=(117.5, 23.891170703, -65), x_dir=(0.5000000000000018, 0, 0.8660254037844377), z_dir=(0, 1, 0)) * Cylinder(5, 61, mode=Mode.PRIVATE)
    add(chamfer_7_piece_2)
    with BuildSketch(Plane(origin=(47.954824017, 25, -130), x_dir=(0, -0.9996219169112969, 0.027495876610582164), z_dir=(1, 0, 0))) as chamfer_7_piece_3_section:
        Polygon((CHAMFER_7_SIZE * 0.999621916911, CHAMFER_7_SIZE * 0.0274958766106), (-CHAMFER_7_SIZE * 0.0274958766106, CHAMFER_7_SIZE * 0.999621916911), (0, 0), align=None)
    chamfer_7_piece_3 = extrude(amount=24.090351966, mode=Mode.PRIVATE)
    chamfer_7_piece_3 = chamfer_7_piece_3 & Plane(origin=(60, 23.891170703, -127.5), x_dir=(0.866025403784438, 0, -0.5000000000000012), z_dir=(0, 1, 0)) * Cylinder(5, 61, mode=Mode.PRIVATE)
    add(chamfer_7_piece_3)
    with BuildSketch(Plane(origin=(0, 25, -77.045175983), x_dir=(0.02749587661058636, -0.9996219169112968, 0), z_dir=(0, 0, 1))) as chamfer_7_piece_4_section:
        Polygon((CHAMFER_7_SIZE * 0.999621916911, -CHAMFER_7_SIZE * 0.0274958766106), (-CHAMFER_7_SIZE * 0.0274958766106, -CHAMFER_7_SIZE * 0.999621916911), (0, 0), align=None)
    chamfer_7_piece_4 = extrude(amount=24.090351966, mode=Mode.PRIVATE)
    chamfer_7_piece_4 = chamfer_7_piece_4 & Plane(origin=(2.5, 23.891170742, -65), x_dir=(-0.5000000000000019, 0, 0.8660254037844376), z_dir=(0, 1, 0)) * Cylinder(5, 61, mode=Mode.PRIVATE)
    add(chamfer_7_piece_4)

    # 圆角6
    fillet_6_edges = [part_3.edges().sort_by_distance(p)[0] for p in [
        (0, 27.5, -69.330127019),
        (0, 26, -60.669872981),
        (64.330127019, 26, -130),
        (55.669872981, 27.5, -130),
        (120, 26, -60.669872981),
        (120, 27.5, -69.330127019),
        (55.669872981, 27.5, 0),
        (64.330127019, 26, 0),
    ]]
    fillet(fillet_6_edges, radius=FILLET_6_R)

    # 圆角7
    fillet_7_edges = [part_3.edges().sort_by_distance(p)[0] for p in [
        (6.943729304, 30, -65),
        (9.010463141, 30, -9.010463141),
        (60, 30, -6.943729304),
        (110.989536859, 30, -9.010463141),
        (113.056270696, 30, -65),
        (110.989536859, 30, -120.989536859),
        (60, 30, -123.056270696),
        (9.010463141, 30, -120.989536859),
        (6.943729304, 30, -65),
        (5.056270696, 30, -65),
        (7.67582836, 30, -7.67582836),
        (60, 30, -5.056270696),
        (112.32417164, 30, -7.67582836),
        (114.943729304, 30, -65),
        (112.32417164, 30, -122.32417164),
        (60, 30, -124.943729304),
        (7.67582836, 30, -122.32417164),
        (5.056270696, 30, -65),
    ]]
    fillet(fillet_7_edges, radius=FILLET_7_R)

    # 草图19 → 切除-拉伸9 (cut)
    with BuildSketch(Plane.ZY):
        with Locations((-112.282662633, 17.10004636)):
            Circle(SKETCH_19_R)
    extrude(amount=-CUT_EXTRUDE_9_DEPTH, mode=Mode.SUBTRACT)


solid = part_3.part
